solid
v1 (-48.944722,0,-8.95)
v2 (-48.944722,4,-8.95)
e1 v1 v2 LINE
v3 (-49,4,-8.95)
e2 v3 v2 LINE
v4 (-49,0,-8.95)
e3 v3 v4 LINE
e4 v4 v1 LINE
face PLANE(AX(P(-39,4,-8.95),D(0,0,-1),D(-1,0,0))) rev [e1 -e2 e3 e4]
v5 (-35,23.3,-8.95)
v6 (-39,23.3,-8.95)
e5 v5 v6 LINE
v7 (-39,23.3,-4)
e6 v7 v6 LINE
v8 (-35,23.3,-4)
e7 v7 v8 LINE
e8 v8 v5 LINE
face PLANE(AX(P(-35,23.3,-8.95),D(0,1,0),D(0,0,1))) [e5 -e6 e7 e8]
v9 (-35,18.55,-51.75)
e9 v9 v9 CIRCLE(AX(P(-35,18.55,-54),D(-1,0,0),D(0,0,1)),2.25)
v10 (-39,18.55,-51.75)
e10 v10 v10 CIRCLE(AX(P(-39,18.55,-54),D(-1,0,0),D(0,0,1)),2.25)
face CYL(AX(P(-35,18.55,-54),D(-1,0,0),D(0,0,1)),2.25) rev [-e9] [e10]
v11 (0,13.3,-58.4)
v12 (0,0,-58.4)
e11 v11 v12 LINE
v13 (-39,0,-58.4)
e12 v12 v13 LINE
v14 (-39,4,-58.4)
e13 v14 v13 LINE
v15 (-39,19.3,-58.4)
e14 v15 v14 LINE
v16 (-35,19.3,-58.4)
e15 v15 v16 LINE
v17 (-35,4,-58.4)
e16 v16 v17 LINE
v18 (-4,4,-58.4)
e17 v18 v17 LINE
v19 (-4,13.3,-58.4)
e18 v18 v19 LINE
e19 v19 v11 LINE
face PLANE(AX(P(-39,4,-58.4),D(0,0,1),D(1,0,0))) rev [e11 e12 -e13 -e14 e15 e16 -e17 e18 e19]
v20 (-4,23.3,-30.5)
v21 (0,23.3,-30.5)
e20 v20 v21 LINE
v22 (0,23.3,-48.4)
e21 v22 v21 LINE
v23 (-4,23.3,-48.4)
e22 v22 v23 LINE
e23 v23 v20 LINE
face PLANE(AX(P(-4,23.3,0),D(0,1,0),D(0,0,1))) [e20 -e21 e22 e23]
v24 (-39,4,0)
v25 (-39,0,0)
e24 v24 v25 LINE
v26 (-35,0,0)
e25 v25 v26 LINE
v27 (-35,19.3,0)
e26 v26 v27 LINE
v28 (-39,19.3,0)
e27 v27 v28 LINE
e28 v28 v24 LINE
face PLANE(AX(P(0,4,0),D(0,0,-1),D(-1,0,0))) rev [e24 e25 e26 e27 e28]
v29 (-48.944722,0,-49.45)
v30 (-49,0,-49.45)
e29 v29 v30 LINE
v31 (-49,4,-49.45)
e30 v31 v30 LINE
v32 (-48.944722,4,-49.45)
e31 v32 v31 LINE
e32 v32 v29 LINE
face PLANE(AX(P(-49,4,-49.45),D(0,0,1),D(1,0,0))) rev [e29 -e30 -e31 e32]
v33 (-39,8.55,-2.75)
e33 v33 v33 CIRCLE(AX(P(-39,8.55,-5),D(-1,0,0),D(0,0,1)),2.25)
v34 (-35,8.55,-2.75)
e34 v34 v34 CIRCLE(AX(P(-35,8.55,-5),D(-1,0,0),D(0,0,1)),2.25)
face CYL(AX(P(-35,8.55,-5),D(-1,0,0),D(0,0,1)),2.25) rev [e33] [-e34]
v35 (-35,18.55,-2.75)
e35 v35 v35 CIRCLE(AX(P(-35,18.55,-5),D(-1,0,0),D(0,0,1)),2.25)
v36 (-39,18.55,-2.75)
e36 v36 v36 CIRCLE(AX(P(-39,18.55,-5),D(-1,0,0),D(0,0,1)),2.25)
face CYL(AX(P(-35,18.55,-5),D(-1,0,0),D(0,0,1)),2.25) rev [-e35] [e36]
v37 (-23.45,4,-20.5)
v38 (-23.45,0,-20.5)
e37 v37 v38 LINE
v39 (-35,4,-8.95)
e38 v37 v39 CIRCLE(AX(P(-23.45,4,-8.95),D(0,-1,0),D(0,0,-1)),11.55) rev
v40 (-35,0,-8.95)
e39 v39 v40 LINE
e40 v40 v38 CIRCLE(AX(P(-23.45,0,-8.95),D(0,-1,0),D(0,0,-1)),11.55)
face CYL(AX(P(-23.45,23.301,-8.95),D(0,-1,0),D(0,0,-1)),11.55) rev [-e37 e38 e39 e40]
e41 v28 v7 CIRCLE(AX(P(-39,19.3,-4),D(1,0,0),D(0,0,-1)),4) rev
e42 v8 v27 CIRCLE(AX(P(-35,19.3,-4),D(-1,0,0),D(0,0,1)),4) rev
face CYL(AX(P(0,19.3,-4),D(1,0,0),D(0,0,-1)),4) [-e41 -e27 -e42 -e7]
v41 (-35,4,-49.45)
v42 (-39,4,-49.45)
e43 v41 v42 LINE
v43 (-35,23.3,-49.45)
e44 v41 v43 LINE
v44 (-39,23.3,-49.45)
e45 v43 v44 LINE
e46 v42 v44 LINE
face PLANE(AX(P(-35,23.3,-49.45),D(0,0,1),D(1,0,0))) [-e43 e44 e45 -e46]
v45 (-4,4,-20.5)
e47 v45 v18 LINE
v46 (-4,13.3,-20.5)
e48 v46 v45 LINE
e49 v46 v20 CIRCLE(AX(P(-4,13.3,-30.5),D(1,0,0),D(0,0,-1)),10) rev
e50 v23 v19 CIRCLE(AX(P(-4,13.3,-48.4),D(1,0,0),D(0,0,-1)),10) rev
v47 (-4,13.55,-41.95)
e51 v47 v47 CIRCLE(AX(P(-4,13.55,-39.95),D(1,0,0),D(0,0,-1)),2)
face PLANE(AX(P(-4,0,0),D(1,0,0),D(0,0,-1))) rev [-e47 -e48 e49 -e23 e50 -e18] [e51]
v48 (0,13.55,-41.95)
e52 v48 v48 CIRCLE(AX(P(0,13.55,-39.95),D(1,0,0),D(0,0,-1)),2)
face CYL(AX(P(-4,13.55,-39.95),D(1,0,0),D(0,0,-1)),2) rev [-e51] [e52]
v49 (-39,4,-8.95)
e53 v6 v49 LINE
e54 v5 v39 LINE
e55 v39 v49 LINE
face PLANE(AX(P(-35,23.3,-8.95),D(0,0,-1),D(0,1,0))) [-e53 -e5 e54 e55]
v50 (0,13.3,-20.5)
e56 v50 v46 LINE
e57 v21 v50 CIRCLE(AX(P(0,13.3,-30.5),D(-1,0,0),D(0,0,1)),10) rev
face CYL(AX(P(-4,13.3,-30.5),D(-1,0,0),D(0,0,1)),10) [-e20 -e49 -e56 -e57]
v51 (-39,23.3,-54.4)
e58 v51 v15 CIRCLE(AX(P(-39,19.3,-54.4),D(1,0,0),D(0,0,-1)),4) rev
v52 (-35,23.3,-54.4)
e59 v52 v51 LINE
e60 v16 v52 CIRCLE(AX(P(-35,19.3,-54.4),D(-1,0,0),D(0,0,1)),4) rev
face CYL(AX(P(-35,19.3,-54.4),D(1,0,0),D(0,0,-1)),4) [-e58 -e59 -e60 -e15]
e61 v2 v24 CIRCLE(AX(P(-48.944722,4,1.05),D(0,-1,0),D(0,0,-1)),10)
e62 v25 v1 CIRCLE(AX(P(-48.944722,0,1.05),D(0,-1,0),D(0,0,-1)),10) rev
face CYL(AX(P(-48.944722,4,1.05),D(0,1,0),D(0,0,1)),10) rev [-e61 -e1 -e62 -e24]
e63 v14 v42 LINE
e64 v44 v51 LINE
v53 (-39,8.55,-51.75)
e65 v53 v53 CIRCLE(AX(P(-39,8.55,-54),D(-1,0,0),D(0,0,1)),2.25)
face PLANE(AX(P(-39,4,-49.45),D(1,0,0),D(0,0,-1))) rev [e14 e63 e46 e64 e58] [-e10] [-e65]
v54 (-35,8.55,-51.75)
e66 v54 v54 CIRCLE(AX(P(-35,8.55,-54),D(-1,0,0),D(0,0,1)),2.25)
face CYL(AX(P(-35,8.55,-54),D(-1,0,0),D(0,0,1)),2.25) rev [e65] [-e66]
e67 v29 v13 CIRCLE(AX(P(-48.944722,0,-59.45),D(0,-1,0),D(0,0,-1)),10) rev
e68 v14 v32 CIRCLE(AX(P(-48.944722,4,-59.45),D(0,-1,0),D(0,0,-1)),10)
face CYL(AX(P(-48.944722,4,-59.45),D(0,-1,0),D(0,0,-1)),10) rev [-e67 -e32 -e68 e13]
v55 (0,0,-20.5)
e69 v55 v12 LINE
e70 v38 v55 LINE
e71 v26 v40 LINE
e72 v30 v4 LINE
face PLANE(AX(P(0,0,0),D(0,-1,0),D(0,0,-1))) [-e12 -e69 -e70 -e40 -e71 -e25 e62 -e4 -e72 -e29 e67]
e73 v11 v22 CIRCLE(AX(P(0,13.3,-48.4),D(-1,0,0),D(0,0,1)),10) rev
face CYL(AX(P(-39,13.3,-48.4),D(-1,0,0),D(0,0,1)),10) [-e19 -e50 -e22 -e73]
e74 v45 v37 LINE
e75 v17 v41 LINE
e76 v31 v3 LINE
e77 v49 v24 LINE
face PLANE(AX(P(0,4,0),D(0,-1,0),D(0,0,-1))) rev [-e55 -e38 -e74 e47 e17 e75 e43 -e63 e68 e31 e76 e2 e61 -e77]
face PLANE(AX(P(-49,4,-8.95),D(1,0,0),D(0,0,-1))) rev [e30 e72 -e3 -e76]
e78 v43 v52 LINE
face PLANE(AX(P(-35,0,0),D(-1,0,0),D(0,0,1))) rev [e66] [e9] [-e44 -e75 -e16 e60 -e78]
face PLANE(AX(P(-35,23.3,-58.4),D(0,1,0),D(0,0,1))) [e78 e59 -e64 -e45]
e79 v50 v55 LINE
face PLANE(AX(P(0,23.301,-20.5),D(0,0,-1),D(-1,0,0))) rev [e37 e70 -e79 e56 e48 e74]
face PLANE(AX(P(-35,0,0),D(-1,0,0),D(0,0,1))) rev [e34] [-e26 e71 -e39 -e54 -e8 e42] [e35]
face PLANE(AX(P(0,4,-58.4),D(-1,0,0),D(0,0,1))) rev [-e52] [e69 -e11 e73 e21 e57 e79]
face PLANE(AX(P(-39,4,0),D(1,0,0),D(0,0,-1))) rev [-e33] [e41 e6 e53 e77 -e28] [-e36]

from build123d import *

# Parameters (mm, degrees)
BOSS_EXTRUDE1_DEPTH = 4
SKETCH2_W           = 8.95
SKETCH2_H           = 19.3
SKETCH2_R           = 2.25
BOSS_EXTRUDE2_DEPTH = 4
FILLET1_R           = 10
FILLET2_R           = 4
SKETCH3_W           = 58.4
SKETCH3_H           = 19.3
SKETCH3_R           = 2
BOSS_EXTRUDE3_DEPTH = 4
CUT_EXTRUDE1_REACH  = 81.715
FILLET3_R           = 10


with BuildPart() as part:
    # Sketch1 → Boss-Extrude1 (new body)
    with BuildSketch(Plane(origin=(0, 0, 0), x_dir=(1, 0, 0), z_dir=(0, 1, 0))):
        Polygon((-49, 49.45), (-39, 49.45), (-39, 58.4), (0, 58.4), (0, 0), (-39, 0), (-39, 8.95), (-49, 8.95), align=None)
    extrude(amount=BOSS_EXTRUDE1_DEPTH)

    # Sketch2 → Boss-Extrude2 (add)
    # profile 1 of 2: a face of its own
    with BuildSketch(Plane.ZY.offset(39)):
        with Locations((-4.475, 13.65)):
            Rectangle(SKETCH2_W, SKETCH2_H)
        with Locations((-5, 18.55)):
            Circle(SKETCH2_R, mode=Mode.SUBTRACT)
        with Locations((-5, 8.55)):
            Circle(SKETCH2_R, mode=Mode.SUBTRACT)
    # profile 2 of 2: a face of its own
    with BuildSketch(Plane.ZY.offset(39)):
        with Locations((-53.925, 13.65)):
            Rectangle(SKETCH2_W, SKETCH2_H)
        with Locations((-54, 18.55)):
            Circle(SKETCH2_R, mode=Mode.SUBTRACT)
        with Locations((-54, 8.55)):
            Circle(SKETCH2_R, mode=Mode.SUBTRACT)
    extrude(amount=-BOSS_EXTRUDE2_DEPTH)

    # Fillet1
    # the kernel refuses this fillet: 10 mm, written as the material it adds along each edge
    with BuildSketch(Plane(origin=(-39, 0, -49.45), x_dir=(-1, 0, 0), z_dir=(0, 1, 0))) as fillet1_piece_1:
        with BuildLine():
            CenterArc((9.944722218, -10), FILLET1_R, 90, 83.97283344)
            Line((0, -8.95), (0, 0))
            Line((0, 0), (9.944722218, 0))
        make_face()
    extrude(amount=4)
    with BuildSketch(Plane(origin=(-39, 0, -8.95), x_dir=(0, 0, 1), z_dir=(0, 1, 0))) as fillet1_piece_2:
        with BuildLine():
            CenterArc((10, -9.944722218), FILLET1_R, 96.02716656, 83.97283344)
            Line((0, -9.944722218), (0, 0))
            Line((0, 0), (8.95, 0))
        make_face()
    extrude(amount=4)

    # Fillet2
    fillet2_edges = [part.edges().sort_by_distance(p)[0] for p in [
        (-37, 23.3, 0),
        (-37, 23.3, -58.4),
    ]]
    fillet(fillet2_edges, radius=FILLET2_R)

    # Sketch3 → Boss-Extrude3 (add)
    with BuildSketch(Plane(origin=(0, 0, 0), x_dir=(0, 0, -1), z_dir=(1, 0, 0))):
        with Locations((29.2, 13.65)):
            Rectangle(SKETCH3_W, SKETCH3_H)
        with Locations((39.95, 13.55)):
            Circle(SKETCH3_R, mode=Mode.SUBTRACT)
    extrude(amount=-BOSS_EXTRUDE3_DEPTH)

    # Sketch4 → Cut-Extrude1 (cut, up to next)
    with BuildSketch(Plane.XZ, mode=Mode.PRIVATE) as cut_extrude1_sk1:
        with BuildLine():
            Line((0, 0), (0, -20.5))
            Line((0, -20.5), (-23.45, -20.5))
            ThreePointArc((-23.45, -20.5), (-31.617083323, -17.117083323), (-35, -8.95))
            Line((-35, -8.95), (-35, 0))
            Line((-35, 0), (0, 0))
        make_face()
    cut_extrude1_tool1 = extrude(cut_extrude1_sk1.sketch, amount=-CUT_EXTRUDE1_REACH, mode=Mode.PRIVATE) & part.part
    add(cut_extrude1_tool1.solids().sort_by_distance((-16.879944, 0, -9.931243))[0], mode=Mode.SUBTRACT)

    # Fillet3
    fillet3_edges = [part.edges().sort_by_distance(p)[0] for p in [
        (-2, 23.3, -20.5),
        (-2, 23.3, -58.4),
    ]]
    fillet(fillet3_edges, radius=FILLET3_R)


solid = part.part
